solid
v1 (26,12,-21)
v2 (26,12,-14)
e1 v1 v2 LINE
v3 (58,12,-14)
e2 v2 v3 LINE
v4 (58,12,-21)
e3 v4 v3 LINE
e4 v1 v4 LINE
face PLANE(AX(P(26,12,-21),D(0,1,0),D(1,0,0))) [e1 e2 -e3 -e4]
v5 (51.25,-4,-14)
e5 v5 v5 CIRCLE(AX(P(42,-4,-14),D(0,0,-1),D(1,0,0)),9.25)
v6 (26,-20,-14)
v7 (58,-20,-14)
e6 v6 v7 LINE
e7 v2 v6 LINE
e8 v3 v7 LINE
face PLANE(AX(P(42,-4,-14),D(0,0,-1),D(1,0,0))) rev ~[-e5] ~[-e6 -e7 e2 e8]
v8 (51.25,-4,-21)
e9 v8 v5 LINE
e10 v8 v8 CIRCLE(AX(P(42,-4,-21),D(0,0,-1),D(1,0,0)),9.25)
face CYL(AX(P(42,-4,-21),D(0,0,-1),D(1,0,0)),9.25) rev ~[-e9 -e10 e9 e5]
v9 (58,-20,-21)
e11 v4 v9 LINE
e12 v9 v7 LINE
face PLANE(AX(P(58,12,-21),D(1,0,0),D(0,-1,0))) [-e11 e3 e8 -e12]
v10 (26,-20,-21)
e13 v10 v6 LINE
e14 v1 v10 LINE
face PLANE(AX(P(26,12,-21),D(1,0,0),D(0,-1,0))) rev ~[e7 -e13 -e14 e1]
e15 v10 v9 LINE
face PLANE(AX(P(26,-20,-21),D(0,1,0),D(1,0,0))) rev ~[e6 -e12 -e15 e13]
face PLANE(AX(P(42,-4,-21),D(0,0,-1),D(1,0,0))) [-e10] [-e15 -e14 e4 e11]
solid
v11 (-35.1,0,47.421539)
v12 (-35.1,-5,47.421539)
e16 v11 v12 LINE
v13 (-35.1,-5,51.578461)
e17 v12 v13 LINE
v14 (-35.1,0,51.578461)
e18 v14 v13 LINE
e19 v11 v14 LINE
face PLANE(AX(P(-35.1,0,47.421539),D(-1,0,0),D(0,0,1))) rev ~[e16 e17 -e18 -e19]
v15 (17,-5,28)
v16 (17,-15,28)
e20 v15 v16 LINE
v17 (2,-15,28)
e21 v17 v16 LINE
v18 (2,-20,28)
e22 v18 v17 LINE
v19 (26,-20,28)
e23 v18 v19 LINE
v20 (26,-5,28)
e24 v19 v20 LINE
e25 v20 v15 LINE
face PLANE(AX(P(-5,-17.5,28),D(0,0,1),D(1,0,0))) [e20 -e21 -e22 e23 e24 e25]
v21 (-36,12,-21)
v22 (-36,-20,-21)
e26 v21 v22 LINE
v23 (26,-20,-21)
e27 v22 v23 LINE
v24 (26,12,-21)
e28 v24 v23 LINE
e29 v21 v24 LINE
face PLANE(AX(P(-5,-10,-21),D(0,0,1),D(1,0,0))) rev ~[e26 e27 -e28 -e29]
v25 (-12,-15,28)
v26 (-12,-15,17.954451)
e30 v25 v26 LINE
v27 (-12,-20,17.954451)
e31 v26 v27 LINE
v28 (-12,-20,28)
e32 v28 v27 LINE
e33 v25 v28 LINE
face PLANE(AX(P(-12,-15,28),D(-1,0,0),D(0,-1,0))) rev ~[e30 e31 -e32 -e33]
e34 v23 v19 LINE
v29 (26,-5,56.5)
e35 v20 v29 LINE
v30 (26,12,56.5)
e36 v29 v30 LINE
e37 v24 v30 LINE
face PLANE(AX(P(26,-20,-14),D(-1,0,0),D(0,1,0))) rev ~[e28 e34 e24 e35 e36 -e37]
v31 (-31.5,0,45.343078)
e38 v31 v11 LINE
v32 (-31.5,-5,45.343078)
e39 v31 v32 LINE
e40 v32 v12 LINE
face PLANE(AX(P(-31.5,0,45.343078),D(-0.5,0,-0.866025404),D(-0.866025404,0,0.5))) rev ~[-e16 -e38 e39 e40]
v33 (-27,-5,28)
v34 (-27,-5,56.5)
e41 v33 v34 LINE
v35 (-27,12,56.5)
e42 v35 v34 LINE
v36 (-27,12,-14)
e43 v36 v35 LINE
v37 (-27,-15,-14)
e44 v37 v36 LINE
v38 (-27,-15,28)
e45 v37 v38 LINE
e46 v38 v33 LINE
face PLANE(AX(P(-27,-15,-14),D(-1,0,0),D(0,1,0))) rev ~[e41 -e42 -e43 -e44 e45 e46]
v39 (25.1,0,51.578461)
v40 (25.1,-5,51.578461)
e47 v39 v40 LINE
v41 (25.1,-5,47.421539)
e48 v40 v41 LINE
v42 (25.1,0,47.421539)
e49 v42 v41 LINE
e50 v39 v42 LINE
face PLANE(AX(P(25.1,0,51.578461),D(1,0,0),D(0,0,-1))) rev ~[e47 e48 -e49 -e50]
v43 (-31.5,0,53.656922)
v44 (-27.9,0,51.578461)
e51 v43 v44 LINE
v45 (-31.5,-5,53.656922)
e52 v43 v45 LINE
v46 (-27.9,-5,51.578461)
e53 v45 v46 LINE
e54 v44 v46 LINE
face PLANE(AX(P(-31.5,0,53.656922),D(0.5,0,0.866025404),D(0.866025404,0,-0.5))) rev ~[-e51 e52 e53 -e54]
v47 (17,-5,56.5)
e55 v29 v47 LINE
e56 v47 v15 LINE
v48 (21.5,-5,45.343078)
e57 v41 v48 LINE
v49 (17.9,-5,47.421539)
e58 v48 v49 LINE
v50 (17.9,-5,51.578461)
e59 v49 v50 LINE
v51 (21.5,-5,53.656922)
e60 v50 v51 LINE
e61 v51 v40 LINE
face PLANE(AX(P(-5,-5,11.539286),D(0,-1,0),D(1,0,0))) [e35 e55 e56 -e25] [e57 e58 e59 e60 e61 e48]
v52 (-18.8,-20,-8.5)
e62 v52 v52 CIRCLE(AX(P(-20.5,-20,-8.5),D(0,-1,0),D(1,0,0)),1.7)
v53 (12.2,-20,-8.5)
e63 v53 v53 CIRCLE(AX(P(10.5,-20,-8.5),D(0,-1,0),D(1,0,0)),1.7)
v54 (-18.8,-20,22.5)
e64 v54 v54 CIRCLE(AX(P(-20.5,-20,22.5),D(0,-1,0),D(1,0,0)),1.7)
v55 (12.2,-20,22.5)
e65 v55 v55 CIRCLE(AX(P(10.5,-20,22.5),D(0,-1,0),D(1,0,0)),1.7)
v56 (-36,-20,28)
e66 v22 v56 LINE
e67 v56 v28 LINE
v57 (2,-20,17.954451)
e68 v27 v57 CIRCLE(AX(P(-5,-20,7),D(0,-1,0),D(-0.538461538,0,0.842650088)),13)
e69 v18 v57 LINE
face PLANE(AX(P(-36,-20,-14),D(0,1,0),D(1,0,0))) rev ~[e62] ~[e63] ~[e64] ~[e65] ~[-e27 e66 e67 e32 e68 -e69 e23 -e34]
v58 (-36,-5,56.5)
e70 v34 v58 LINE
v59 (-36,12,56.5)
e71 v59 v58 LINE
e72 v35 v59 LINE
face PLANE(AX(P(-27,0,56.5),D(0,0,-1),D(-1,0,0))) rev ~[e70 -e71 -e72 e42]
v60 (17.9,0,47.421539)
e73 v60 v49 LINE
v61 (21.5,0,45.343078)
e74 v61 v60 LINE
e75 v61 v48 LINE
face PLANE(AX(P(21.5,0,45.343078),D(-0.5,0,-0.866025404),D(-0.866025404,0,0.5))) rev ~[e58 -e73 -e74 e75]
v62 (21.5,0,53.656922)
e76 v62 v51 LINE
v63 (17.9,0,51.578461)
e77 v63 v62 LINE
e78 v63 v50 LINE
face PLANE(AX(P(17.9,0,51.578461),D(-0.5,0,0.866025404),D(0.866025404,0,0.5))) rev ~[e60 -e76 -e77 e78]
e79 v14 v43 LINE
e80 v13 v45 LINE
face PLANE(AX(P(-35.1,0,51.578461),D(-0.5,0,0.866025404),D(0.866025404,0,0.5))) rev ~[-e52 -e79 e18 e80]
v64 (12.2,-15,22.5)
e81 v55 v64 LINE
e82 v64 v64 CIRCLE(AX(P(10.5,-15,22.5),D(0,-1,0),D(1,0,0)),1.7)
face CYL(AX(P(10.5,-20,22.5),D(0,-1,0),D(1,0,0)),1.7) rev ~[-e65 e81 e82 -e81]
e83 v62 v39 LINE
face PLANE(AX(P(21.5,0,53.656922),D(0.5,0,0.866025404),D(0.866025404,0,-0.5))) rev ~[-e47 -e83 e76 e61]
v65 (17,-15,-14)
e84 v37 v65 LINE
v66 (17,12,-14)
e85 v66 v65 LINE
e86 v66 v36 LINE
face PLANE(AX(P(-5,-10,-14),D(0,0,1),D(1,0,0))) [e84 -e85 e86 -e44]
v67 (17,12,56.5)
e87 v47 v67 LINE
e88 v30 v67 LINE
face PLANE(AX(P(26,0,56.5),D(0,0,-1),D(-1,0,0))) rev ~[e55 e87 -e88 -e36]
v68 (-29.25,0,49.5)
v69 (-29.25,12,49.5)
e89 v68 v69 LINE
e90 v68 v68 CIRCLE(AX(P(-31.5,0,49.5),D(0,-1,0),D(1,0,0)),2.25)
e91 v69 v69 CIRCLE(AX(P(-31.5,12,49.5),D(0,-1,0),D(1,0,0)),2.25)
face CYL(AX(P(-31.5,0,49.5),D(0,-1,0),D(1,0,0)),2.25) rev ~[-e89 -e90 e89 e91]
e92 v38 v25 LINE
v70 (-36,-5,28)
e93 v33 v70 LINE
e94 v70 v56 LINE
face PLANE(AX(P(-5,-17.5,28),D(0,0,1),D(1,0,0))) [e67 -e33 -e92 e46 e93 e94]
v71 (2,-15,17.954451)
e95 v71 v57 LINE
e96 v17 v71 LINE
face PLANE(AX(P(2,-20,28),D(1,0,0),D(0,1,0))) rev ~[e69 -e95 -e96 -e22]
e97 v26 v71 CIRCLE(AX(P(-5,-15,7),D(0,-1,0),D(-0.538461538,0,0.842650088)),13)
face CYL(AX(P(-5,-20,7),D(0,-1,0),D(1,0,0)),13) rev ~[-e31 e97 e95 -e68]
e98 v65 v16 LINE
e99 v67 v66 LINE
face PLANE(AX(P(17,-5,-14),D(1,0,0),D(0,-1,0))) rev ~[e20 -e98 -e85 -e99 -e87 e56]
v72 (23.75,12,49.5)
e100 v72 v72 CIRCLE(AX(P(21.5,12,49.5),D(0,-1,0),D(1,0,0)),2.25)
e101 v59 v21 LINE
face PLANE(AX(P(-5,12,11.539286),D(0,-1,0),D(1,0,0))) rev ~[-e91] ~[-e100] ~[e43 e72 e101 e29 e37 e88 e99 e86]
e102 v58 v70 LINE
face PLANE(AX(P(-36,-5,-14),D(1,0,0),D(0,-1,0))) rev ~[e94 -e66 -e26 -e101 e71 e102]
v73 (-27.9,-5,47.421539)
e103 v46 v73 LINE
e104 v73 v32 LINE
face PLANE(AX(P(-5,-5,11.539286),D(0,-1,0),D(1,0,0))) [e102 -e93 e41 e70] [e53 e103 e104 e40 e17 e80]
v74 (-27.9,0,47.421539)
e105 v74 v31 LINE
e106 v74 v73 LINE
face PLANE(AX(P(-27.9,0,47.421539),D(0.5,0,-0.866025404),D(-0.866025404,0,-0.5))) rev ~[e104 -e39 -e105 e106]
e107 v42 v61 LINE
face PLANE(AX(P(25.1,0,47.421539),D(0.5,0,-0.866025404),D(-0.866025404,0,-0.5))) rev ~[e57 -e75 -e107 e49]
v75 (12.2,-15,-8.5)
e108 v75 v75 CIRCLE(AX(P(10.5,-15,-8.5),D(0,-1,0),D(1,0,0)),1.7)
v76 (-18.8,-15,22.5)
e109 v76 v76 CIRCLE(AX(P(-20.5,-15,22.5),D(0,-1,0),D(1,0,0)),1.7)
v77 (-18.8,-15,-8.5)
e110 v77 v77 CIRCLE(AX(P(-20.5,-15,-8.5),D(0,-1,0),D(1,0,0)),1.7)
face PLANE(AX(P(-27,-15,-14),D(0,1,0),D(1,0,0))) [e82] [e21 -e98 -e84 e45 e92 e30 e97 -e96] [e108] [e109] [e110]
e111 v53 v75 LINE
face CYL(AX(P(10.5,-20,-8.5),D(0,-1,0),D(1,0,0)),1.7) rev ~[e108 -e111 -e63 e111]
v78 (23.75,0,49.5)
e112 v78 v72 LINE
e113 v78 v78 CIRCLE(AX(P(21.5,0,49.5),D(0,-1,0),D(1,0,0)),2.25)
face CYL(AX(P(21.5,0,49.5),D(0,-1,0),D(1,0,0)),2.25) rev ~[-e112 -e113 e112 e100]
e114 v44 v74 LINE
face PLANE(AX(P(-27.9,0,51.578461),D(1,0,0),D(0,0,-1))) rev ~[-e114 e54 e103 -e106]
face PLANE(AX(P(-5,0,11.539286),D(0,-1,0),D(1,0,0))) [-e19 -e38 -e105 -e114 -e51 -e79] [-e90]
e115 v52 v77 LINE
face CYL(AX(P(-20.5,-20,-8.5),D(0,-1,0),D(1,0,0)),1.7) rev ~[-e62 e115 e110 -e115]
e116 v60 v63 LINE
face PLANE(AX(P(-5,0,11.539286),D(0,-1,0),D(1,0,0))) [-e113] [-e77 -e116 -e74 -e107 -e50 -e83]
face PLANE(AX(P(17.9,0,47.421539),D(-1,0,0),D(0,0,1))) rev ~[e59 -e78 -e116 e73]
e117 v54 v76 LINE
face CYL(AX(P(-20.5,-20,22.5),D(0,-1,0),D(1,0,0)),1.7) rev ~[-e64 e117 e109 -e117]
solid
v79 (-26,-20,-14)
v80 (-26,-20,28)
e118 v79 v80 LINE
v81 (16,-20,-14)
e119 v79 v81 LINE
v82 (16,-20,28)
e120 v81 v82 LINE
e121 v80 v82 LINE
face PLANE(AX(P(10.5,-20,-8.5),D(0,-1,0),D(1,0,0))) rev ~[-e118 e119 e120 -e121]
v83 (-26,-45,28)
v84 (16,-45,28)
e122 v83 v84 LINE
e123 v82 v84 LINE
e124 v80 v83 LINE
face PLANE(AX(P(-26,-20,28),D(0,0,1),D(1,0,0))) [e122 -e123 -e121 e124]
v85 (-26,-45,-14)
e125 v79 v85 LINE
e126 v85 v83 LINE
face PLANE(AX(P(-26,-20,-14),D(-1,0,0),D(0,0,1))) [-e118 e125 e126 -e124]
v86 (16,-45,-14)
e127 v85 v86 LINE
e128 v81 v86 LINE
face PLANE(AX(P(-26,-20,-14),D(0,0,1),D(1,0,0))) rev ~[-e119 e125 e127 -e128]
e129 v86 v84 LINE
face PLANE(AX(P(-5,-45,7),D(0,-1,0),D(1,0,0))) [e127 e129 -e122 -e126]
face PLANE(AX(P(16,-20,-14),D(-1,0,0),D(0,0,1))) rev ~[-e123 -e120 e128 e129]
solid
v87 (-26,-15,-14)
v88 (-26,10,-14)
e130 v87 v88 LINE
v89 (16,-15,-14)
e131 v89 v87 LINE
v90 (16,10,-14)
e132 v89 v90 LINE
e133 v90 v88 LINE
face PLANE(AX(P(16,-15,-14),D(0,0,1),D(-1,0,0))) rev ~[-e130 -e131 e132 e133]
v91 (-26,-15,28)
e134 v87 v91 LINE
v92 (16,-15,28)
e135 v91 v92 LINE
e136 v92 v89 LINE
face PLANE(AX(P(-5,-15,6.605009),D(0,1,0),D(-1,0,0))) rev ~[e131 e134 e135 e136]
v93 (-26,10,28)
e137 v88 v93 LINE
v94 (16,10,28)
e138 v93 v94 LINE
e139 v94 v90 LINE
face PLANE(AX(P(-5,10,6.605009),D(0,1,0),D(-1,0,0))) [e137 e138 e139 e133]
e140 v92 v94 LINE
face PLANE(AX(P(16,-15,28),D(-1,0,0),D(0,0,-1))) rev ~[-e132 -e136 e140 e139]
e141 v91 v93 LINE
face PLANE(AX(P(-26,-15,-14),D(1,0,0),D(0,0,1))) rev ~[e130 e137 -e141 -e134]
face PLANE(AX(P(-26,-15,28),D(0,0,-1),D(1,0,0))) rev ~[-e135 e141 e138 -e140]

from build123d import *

# Parameters (mm, degrees)
F1_R      = 2.25
F2_DEPTH  = 12
F4_DEPTH  = 5
F5_W      = 44
F5_H      = 10
F5_H_2    = 5
F6_DEPTH  = 7
F7_DEPTH  = 42
F8_R      = 1.7
F8_R_2    = 13
F9_DEPTH  = 5
F11_REACH = 63.8670687473
F12_R     = 1.7
F13_DEPTH = 25
F14_W     = 42
F14_H     = 42
F14_R     = 1.7
F14_R_2   = 13
F15_DEPTH = 25
F16_W     = 32
F16_H     = 32
F16_R     = 9.25
F17_DEPTH = 7


with BuildPart() as f2:
    # F1 (on Front) → F2 (new body)
    with BuildSketch(Plane.XZ):
        Polygon((-27, 56.5), (-36, 56.5), (-36, -21), (26, -21), (26, 56.5), (17, 56.5), (17, -14), (-27, -14), align=None)
        with Locations((-31.5, 49.5)):
            Circle(F1_R, mode=Mode.SUBTRACT)
        with Locations((21.5, 49.5)):
            Circle(F1_R, mode=Mode.SUBTRACT)
    extrude(amount=-F2_DEPTH)

    # F3 (on face) → F4 (join)
    with BuildSketch(Plane.XZ):
        Polygon((-27, -14), (-27, 56.5), (-36, 56.5), (-36, -21), (26, -21), (26, 56.5), (17, 56.5), (17, -14), align=None)
        Polygon((-31.5, 53.6569219382), (-27.9, 51.5784609691), (-27.9, 47.4215390309), (-31.5, 45.3430780618), (-35.1, 47.4215390309), (-35.1, 51.5784609691), align=None, mode=Mode.SUBTRACT)
        Polygon((21.5, 53.6569219382), (25.1, 51.5784609691), (25.1, 47.4215390309), (21.5, 45.3430780618), (17.9, 47.4215390309), (17.9, 51.5784609691), align=None, mode=Mode.SUBTRACT)
    extrude(amount=F4_DEPTH)

    # F5 (on face) → F6 (join, through all)
    with BuildSketch(Plane.XY.offset(-14)):
        with Locations((-5, -10)):
            Rectangle(F5_W, F5_H)
        with Locations((-5, -17.5)):
            Rectangle(F5_W, F5_H_2)
        Polygon((-27, -15), (-27, -5), (-36, -5), (-36, -20), (-27, -20), align=None)
        Polygon((26, -5), (17, -5), (17, -15), (17, -20), (26, -20), align=None)
    extrude(amount=-F6_DEPTH)

    # F5 (on face) → F7 (join)
    with BuildSketch(Plane.XY.offset(-14)):
        with Locations((-5, -17.5)):
            Rectangle(F5_W, F5_H_2)
        Polygon((-27, -15), (-27, -5), (-36, -5), (-36, -20), (-27, -20), align=None)
        Polygon((26, -5), (17, -5), (17, -15), (17, -20), (26, -20), align=None)
    extrude(amount=F7_DEPTH)

    # F8 (on face) → F9 (cut, through all)
    with BuildSketch(Plane.XZ.offset(20)):
        with Locations((-20.5, 22.5)):
            Circle(F8_R)
        with Locations((-5, 7)):
            Circle(F8_R_2)
        with Locations((-20.5, -8.5)):
            Circle(F8_R)
        with Locations((10.5, -8.5)):
            Circle(F8_R)
        with Locations((10.5, 22.5)):
            Circle(F8_R)
    extrude(amount=-F9_DEPTH, mode=Mode.SUBTRACT)

    f11_end = f2.faces().sort_by_distance((-18, -17.5, 7))[0]
    # F10 (on face) → F11 (cut, up to a face of the model that its end follows)
    with BuildSketch(Plane.XY.offset(28)):
        Polygon((2, -15), (-5, -15), (-12, -15), (-12, -20), (2, -20), align=None)
    f11_long = extrude(amount=-F11_REACH, mode=Mode.PRIVATE)
    add(split(f11_long, bisect_by=f11_end, keep=Keep.ALL, mode=Mode.PRIVATE).solids().sort_by_distance((-5, -17.5, 28))[0], mode=Mode.SUBTRACT)


with BuildPart() as f13:
    # F12 (on face) → F13 (new body)
    with BuildSketch(Plane(origin=(0, -15, 0), x_dir=(-1, 0, 0), z_dir=(0, 1, 0))):
        with BuildLine():
            Line((-16, -14), (26, -14))
            Line((26, -14), (26, 28))
            Line((26, 28), (12, 28))
            Line((12, 28), (12, 17.9544511501))
            ThreePointArc((12, 17.9544511501), (5, -6), (-2, 17.9544511501))
            Line((-2, 17.9544511501), (-2, 28))
            Line((-2, 28), (-16, 28))
            Line((-16, 28), (-16, -14))
        make_face()
        with Locations((-10.5, -8.5)):
            Circle(F12_R, mode=Mode.SUBTRACT)
        with Locations((20.5, -8.5)):
            Circle(F12_R, mode=Mode.SUBTRACT)
        with Locations((-10.5, 22.5)):
            Circle(F12_R, mode=Mode.SUBTRACT)
        with Locations((20.5, 22.5)):
            Circle(F12_R, mode=Mode.SUBTRACT)
        with BuildLine():
            Line((12, 17.9544511501), (12, 28))
            Line((12, 28), (-2, 28))
            Line((-2, 28), (-2, 17.9544511501))
            ThreePointArc((-2, 17.9544511501), (5, -6), (12, 17.9544511501))
        make_face()
        with Locations((-10.5, 22.5)):
            Circle(F12_R)
        with Locations((20.5, 22.5)):
            Circle(F12_R)
        with Locations((-10.5, -8.5)):
            Circle(F12_R)
        with Locations((20.5, -8.5)):
            Circle(F12_R)
    extrude(amount=F13_DEPTH)


with BuildPart() as f15:
    # F14 (on face) → F15 (new body)
    with BuildSketch(Plane.XZ.offset(20)):
        with Locations((-5, 7)):
            Rectangle(F14_W, F14_H)
        with Locations((-20.5, -8.5)):
            Circle(F14_R, mode=Mode.SUBTRACT)
        with Locations((10.5, -8.5)):
            Circle(F14_R, mode=Mode.SUBTRACT)
        with Locations((-20.5, 22.5)):
            Circle(F14_R, mode=Mode.SUBTRACT)
        with Locations((-5, 7)):
            Circle(F14_R_2, mode=Mode.SUBTRACT)
        with Locations((10.5, 22.5)):
            Circle(F14_R, mode=Mode.SUBTRACT)
    extrude(amount=F15_DEPTH)

    # F8 (on face) → F15, piece 2 (join)
    with BuildSketch(Plane.XZ.offset(20)):
        with Locations((-20.5, 22.5)):
            Circle(F8_R)
    extrude(amount=F15_DEPTH)

    # F8 (on face) → F15, piece 3 (join)
    with BuildSketch(Plane.XZ.offset(20)):
        with Locations((-5, 7)):
            Circle(F8_R_2)
    extrude(amount=F15_DEPTH)

    # F8 (on face) → F15, piece 4 (join)
    with BuildSketch(Plane.XZ.offset(20)):
        with Locations((-20.5, -8.5)):
            Circle(F8_R)
    extrude(amount=F15_DEPTH)

    # F8 (on face) → F15, piece 5 (join)
    with BuildSketch(Plane.XZ.offset(20)):
        with Locations((10.5, 22.5)):
            Circle(F8_R)
    extrude(amount=F15_DEPTH)

    # F8 (on face) → F15, piece 6 (join)
    with BuildSketch(Plane.XZ.offset(20)):
        with Locations((10.5, -8.5)):
            Circle(F8_R)
    extrude(amount=F15_DEPTH)


with BuildPart() as f17:
    # F16 (on face) → F17 (new body, through all)
    with BuildSketch(Plane(origin=(0, 0, -21), x_dir=(1, 0, 0), z_dir=(0, 0, -1))):
        with Locations((42, 4)):
            Rectangle(F16_W, F16_H)
        with Locations((42, 4)):
            Circle(F16_R, mode=Mode.SUBTRACT)
    extrude(amount=-F17_DEPTH)


solid = Compound([f2.part, f13.part, f15.part, f17.part])
